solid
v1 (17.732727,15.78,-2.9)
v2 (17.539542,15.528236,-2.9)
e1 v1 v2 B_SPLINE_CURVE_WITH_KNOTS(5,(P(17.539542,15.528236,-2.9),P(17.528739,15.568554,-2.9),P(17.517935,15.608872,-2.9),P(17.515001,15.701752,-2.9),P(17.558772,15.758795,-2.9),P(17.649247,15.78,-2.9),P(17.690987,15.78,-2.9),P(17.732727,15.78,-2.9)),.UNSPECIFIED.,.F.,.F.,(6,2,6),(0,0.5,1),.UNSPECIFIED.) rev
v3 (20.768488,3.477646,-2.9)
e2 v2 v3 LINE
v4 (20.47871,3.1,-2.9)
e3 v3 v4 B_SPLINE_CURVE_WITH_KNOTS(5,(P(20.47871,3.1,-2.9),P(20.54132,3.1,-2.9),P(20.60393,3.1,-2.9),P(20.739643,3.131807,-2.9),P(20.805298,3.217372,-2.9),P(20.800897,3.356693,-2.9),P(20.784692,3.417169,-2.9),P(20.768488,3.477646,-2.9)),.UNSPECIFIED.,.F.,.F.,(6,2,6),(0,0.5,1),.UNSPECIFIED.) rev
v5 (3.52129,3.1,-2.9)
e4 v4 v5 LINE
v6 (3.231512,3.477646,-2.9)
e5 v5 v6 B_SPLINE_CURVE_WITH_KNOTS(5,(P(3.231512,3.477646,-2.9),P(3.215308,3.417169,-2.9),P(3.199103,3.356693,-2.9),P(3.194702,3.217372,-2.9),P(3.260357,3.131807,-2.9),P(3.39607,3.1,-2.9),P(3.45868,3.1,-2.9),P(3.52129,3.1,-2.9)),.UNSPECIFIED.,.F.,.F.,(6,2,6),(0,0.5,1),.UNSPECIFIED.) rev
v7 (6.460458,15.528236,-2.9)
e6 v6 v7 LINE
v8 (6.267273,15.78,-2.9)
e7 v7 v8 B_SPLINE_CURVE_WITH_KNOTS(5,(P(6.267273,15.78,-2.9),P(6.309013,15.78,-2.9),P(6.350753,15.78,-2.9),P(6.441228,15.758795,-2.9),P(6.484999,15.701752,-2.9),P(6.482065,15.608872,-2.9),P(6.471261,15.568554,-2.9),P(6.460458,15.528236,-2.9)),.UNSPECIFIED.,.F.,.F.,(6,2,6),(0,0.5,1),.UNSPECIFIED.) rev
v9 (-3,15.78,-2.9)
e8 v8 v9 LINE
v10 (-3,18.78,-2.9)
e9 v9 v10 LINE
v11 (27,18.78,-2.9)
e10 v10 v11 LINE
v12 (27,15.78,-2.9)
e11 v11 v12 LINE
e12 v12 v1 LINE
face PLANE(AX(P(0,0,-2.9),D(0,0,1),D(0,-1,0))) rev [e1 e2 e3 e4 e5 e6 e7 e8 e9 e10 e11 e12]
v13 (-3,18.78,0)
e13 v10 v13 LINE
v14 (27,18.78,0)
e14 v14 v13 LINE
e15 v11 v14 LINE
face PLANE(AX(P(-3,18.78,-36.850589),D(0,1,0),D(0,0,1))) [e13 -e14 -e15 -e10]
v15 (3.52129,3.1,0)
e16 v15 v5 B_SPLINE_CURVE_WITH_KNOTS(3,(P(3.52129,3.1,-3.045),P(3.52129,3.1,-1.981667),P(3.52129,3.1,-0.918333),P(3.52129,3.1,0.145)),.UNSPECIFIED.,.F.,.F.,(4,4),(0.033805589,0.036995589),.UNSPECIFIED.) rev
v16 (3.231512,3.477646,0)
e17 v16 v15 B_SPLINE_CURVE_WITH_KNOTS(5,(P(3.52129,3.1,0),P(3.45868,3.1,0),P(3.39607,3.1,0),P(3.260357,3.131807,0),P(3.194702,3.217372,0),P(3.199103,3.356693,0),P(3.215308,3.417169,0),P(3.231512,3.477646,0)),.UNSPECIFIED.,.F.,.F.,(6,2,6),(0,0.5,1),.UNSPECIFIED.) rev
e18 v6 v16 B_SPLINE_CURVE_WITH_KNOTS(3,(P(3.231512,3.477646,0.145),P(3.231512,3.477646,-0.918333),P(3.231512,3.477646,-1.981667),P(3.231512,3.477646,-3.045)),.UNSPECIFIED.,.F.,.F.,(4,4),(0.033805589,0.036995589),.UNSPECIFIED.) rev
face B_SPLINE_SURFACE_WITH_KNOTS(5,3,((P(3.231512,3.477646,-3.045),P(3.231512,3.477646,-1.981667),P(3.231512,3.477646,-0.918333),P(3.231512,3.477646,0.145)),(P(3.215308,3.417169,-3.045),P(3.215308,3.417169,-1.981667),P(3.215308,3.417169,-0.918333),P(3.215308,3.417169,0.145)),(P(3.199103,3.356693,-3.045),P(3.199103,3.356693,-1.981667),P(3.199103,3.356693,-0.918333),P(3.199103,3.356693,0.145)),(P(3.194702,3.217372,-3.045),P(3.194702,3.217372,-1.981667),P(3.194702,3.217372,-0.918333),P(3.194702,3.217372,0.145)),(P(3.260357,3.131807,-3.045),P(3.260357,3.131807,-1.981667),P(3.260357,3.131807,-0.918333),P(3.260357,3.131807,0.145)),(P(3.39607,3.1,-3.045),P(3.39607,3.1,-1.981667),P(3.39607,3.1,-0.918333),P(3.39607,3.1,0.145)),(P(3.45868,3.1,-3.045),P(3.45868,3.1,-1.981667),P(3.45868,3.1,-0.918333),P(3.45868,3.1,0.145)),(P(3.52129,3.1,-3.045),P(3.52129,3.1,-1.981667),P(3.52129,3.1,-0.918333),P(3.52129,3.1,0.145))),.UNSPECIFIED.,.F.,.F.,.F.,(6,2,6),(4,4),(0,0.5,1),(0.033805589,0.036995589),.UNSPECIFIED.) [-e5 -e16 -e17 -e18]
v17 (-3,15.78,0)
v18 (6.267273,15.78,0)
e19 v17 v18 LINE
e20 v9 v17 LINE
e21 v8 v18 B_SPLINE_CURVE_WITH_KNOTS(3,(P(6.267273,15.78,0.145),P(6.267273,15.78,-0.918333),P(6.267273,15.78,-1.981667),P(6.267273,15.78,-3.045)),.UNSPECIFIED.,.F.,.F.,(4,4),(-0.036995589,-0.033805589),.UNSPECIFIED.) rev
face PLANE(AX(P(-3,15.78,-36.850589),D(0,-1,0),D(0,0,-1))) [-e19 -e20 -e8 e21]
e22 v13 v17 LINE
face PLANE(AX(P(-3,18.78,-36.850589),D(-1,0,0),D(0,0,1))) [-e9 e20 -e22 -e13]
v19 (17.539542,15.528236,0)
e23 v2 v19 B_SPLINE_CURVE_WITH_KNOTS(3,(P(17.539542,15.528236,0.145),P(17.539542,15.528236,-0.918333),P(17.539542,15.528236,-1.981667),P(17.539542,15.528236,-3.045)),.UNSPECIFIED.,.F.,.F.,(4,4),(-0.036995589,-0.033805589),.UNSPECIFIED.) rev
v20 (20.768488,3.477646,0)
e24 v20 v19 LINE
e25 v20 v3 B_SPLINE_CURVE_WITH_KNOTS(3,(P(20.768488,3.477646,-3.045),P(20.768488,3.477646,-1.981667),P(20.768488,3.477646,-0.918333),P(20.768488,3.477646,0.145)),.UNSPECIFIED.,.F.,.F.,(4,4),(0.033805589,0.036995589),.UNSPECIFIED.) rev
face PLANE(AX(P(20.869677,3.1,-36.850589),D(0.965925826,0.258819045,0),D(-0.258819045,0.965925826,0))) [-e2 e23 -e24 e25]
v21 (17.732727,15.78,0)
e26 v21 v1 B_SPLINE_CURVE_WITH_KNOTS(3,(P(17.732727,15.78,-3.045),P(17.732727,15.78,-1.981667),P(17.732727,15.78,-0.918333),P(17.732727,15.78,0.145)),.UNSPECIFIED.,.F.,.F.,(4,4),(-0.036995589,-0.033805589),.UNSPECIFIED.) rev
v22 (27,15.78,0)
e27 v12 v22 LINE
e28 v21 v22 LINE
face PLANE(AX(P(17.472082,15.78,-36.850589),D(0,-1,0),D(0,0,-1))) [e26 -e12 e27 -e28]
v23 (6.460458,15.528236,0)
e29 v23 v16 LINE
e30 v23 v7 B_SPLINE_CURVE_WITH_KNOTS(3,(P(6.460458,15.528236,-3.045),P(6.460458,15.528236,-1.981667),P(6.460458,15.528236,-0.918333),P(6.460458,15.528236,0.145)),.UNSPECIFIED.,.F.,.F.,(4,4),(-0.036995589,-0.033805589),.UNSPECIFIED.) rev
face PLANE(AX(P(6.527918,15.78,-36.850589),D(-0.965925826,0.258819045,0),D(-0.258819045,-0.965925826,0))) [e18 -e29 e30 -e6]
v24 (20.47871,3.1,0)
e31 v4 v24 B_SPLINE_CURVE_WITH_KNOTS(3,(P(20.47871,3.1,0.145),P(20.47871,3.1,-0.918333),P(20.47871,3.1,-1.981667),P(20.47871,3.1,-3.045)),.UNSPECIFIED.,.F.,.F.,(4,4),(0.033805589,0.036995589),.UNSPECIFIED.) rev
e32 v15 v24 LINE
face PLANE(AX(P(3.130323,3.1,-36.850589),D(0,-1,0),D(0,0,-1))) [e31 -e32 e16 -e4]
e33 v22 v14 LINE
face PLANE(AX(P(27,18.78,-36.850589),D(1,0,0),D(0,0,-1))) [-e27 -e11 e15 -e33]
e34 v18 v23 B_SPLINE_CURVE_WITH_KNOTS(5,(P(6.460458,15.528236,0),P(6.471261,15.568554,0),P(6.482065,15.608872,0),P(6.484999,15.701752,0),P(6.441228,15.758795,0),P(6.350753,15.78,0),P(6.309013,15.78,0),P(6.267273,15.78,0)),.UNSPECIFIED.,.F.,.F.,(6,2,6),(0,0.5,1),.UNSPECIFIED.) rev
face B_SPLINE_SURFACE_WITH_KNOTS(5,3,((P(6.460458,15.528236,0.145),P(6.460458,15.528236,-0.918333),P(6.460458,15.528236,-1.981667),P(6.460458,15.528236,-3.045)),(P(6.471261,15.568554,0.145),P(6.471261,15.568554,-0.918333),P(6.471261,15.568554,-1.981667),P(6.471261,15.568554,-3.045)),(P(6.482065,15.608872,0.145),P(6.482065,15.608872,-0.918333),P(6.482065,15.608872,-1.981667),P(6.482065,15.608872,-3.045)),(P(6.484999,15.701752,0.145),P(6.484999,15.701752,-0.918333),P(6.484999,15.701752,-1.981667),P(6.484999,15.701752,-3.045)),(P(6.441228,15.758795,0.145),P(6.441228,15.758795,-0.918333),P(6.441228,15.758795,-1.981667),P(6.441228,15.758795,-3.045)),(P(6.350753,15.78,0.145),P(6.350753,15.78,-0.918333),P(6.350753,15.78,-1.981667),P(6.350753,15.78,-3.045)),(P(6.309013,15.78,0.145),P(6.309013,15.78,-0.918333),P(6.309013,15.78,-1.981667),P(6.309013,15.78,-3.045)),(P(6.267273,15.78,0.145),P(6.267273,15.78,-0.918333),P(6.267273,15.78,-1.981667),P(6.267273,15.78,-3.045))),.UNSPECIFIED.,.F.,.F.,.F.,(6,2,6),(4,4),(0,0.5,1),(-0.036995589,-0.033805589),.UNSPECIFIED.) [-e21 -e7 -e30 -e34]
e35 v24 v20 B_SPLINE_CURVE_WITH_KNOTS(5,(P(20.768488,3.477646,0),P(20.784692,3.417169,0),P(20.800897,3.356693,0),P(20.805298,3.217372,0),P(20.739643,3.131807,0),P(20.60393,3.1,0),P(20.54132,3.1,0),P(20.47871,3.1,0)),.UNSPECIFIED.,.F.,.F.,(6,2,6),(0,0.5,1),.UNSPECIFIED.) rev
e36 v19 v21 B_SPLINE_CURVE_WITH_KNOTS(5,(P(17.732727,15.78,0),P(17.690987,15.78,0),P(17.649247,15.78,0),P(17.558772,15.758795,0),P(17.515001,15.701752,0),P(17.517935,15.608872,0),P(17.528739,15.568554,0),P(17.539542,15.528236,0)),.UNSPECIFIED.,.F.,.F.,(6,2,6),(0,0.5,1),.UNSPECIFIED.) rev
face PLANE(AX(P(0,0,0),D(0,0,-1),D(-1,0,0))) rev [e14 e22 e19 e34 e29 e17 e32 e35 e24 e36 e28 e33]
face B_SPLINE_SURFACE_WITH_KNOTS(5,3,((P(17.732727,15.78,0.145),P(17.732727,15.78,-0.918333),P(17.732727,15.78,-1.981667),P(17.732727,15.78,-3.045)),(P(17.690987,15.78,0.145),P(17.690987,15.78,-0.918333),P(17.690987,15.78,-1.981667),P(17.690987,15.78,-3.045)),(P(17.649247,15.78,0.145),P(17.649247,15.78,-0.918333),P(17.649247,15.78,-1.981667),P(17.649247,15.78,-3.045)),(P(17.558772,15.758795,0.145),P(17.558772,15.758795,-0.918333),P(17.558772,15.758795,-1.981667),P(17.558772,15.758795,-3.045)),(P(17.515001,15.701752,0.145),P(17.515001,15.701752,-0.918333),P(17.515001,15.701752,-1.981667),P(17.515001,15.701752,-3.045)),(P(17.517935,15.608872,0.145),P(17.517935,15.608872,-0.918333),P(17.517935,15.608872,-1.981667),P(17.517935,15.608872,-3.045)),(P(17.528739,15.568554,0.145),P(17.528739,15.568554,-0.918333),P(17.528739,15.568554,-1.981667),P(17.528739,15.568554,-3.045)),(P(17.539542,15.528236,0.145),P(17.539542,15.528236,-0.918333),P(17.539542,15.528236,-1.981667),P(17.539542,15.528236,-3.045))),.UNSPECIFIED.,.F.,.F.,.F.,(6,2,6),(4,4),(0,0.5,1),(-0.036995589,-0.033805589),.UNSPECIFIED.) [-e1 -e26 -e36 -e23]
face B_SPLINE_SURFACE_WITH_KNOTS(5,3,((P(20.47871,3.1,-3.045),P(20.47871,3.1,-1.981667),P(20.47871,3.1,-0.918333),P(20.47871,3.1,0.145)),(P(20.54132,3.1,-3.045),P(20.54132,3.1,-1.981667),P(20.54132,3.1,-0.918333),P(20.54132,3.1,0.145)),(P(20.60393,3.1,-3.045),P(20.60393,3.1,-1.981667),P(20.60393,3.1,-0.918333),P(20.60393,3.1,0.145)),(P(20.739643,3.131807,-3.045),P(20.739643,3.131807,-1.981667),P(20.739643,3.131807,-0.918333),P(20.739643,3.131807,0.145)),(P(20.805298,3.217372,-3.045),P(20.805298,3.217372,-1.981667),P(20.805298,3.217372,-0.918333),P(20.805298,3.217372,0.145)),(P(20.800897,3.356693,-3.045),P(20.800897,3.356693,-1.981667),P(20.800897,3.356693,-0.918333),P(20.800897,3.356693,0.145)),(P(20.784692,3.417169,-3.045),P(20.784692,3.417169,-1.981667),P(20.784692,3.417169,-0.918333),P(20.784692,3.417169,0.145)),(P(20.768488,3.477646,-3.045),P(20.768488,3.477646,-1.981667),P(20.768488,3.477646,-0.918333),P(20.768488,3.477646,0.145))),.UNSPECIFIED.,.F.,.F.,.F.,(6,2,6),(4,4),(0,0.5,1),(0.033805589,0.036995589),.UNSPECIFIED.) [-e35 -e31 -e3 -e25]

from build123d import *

# Parameters (mm, degrees)
BOSS_EXTRUDE1_DEPTH = 2.9


with BuildPart() as part:
    # Sketch2 → Boss-Extrude1 (new body)
    with BuildSketch(Plane.XY):
        Polygon((6.527918297, 15.78), (3.130322537, 3.1), (20.869677463, 3.1), (17.472081703, 15.78), (27, 15.78), (27, 18.78), (-3, 18.78), (-3, 15.78), align=None)
    extrude(amount=-BOSS_EXTRUDE1_DEPTH)

    # Fillet1
    # a fillet whose section is not a circle: 0.3 mm, written as the material it takes off along each edge
    with BuildSketch(Plane(origin=(3.130322537, 3.1, 0.97741903), x_dir=(0.2588190451025178, 0.9659258262890691, 0), z_dir=(0, 0, -1)), Plane(origin=(20.869677463, 3.1, 0.97741903), x_dir=(-1, 0, 0), z_dir=(0, 0, -1))) as fillet1_piece_1:
        with BuildLine():
            add(Edge.make_bspline([(0.390967612, 0), (0.328357725, 0), (0.265747838, 0), (0.130034743, 0.031807338), (0.064378997, 0.117371571), (0.068780602, 0.2566927), (0.084985233, 0.317169207), (0.101189864, 0.377645714)], knots=[0, 0, 0, 0, 0, 0, 0.5, 0.5, 1, 1, 1, 1, 1, 1], degree=5))
            Line((0.101189864, 0.377645714), (0, 0))
            Line((0, 0), (0.390967612, 0))
        make_face()
    extrude(amount=4.854838059, mode=Mode.SUBTRACT)

    # Fillet2
    # a fillet whose section is not a circle: 0.2 mm, written as the material it adds along each edge
    with BuildSketch(Plane(origin=(6.527918297, 15.78, 0), x_dir=(-0.25881904510252, -0.9659258262890685, 0), z_dir=(0, 0, -1)), Plane(origin=(17.472081703, 15.78, 0), x_dir=(1, 0, 0), z_dir=(0, 0, -1))) as fillet2_piece_1:
        with BuildLine():
            add(Edge.make_bspline([(0.260645075, 0), (0.21890515, 0), (0.177165225, 0), (0.086689828, 0.021204892), (0.042919331, 0.078247714), (0.045853734, 0.171128466), (0.056656822, 0.211446138), (0.067459909, 0.251763809)], knots=[0, 0, 0, 0, 0, 0, 0.5, 0.5, 1, 1, 1, 1, 1, 1], degree=5))
            Line((0.067459909, 0.251763809), (0, 0))
            Line((0, 0), (0.260645075, 0))
        make_face()
    extrude(amount=2.9)


solid = part.part
